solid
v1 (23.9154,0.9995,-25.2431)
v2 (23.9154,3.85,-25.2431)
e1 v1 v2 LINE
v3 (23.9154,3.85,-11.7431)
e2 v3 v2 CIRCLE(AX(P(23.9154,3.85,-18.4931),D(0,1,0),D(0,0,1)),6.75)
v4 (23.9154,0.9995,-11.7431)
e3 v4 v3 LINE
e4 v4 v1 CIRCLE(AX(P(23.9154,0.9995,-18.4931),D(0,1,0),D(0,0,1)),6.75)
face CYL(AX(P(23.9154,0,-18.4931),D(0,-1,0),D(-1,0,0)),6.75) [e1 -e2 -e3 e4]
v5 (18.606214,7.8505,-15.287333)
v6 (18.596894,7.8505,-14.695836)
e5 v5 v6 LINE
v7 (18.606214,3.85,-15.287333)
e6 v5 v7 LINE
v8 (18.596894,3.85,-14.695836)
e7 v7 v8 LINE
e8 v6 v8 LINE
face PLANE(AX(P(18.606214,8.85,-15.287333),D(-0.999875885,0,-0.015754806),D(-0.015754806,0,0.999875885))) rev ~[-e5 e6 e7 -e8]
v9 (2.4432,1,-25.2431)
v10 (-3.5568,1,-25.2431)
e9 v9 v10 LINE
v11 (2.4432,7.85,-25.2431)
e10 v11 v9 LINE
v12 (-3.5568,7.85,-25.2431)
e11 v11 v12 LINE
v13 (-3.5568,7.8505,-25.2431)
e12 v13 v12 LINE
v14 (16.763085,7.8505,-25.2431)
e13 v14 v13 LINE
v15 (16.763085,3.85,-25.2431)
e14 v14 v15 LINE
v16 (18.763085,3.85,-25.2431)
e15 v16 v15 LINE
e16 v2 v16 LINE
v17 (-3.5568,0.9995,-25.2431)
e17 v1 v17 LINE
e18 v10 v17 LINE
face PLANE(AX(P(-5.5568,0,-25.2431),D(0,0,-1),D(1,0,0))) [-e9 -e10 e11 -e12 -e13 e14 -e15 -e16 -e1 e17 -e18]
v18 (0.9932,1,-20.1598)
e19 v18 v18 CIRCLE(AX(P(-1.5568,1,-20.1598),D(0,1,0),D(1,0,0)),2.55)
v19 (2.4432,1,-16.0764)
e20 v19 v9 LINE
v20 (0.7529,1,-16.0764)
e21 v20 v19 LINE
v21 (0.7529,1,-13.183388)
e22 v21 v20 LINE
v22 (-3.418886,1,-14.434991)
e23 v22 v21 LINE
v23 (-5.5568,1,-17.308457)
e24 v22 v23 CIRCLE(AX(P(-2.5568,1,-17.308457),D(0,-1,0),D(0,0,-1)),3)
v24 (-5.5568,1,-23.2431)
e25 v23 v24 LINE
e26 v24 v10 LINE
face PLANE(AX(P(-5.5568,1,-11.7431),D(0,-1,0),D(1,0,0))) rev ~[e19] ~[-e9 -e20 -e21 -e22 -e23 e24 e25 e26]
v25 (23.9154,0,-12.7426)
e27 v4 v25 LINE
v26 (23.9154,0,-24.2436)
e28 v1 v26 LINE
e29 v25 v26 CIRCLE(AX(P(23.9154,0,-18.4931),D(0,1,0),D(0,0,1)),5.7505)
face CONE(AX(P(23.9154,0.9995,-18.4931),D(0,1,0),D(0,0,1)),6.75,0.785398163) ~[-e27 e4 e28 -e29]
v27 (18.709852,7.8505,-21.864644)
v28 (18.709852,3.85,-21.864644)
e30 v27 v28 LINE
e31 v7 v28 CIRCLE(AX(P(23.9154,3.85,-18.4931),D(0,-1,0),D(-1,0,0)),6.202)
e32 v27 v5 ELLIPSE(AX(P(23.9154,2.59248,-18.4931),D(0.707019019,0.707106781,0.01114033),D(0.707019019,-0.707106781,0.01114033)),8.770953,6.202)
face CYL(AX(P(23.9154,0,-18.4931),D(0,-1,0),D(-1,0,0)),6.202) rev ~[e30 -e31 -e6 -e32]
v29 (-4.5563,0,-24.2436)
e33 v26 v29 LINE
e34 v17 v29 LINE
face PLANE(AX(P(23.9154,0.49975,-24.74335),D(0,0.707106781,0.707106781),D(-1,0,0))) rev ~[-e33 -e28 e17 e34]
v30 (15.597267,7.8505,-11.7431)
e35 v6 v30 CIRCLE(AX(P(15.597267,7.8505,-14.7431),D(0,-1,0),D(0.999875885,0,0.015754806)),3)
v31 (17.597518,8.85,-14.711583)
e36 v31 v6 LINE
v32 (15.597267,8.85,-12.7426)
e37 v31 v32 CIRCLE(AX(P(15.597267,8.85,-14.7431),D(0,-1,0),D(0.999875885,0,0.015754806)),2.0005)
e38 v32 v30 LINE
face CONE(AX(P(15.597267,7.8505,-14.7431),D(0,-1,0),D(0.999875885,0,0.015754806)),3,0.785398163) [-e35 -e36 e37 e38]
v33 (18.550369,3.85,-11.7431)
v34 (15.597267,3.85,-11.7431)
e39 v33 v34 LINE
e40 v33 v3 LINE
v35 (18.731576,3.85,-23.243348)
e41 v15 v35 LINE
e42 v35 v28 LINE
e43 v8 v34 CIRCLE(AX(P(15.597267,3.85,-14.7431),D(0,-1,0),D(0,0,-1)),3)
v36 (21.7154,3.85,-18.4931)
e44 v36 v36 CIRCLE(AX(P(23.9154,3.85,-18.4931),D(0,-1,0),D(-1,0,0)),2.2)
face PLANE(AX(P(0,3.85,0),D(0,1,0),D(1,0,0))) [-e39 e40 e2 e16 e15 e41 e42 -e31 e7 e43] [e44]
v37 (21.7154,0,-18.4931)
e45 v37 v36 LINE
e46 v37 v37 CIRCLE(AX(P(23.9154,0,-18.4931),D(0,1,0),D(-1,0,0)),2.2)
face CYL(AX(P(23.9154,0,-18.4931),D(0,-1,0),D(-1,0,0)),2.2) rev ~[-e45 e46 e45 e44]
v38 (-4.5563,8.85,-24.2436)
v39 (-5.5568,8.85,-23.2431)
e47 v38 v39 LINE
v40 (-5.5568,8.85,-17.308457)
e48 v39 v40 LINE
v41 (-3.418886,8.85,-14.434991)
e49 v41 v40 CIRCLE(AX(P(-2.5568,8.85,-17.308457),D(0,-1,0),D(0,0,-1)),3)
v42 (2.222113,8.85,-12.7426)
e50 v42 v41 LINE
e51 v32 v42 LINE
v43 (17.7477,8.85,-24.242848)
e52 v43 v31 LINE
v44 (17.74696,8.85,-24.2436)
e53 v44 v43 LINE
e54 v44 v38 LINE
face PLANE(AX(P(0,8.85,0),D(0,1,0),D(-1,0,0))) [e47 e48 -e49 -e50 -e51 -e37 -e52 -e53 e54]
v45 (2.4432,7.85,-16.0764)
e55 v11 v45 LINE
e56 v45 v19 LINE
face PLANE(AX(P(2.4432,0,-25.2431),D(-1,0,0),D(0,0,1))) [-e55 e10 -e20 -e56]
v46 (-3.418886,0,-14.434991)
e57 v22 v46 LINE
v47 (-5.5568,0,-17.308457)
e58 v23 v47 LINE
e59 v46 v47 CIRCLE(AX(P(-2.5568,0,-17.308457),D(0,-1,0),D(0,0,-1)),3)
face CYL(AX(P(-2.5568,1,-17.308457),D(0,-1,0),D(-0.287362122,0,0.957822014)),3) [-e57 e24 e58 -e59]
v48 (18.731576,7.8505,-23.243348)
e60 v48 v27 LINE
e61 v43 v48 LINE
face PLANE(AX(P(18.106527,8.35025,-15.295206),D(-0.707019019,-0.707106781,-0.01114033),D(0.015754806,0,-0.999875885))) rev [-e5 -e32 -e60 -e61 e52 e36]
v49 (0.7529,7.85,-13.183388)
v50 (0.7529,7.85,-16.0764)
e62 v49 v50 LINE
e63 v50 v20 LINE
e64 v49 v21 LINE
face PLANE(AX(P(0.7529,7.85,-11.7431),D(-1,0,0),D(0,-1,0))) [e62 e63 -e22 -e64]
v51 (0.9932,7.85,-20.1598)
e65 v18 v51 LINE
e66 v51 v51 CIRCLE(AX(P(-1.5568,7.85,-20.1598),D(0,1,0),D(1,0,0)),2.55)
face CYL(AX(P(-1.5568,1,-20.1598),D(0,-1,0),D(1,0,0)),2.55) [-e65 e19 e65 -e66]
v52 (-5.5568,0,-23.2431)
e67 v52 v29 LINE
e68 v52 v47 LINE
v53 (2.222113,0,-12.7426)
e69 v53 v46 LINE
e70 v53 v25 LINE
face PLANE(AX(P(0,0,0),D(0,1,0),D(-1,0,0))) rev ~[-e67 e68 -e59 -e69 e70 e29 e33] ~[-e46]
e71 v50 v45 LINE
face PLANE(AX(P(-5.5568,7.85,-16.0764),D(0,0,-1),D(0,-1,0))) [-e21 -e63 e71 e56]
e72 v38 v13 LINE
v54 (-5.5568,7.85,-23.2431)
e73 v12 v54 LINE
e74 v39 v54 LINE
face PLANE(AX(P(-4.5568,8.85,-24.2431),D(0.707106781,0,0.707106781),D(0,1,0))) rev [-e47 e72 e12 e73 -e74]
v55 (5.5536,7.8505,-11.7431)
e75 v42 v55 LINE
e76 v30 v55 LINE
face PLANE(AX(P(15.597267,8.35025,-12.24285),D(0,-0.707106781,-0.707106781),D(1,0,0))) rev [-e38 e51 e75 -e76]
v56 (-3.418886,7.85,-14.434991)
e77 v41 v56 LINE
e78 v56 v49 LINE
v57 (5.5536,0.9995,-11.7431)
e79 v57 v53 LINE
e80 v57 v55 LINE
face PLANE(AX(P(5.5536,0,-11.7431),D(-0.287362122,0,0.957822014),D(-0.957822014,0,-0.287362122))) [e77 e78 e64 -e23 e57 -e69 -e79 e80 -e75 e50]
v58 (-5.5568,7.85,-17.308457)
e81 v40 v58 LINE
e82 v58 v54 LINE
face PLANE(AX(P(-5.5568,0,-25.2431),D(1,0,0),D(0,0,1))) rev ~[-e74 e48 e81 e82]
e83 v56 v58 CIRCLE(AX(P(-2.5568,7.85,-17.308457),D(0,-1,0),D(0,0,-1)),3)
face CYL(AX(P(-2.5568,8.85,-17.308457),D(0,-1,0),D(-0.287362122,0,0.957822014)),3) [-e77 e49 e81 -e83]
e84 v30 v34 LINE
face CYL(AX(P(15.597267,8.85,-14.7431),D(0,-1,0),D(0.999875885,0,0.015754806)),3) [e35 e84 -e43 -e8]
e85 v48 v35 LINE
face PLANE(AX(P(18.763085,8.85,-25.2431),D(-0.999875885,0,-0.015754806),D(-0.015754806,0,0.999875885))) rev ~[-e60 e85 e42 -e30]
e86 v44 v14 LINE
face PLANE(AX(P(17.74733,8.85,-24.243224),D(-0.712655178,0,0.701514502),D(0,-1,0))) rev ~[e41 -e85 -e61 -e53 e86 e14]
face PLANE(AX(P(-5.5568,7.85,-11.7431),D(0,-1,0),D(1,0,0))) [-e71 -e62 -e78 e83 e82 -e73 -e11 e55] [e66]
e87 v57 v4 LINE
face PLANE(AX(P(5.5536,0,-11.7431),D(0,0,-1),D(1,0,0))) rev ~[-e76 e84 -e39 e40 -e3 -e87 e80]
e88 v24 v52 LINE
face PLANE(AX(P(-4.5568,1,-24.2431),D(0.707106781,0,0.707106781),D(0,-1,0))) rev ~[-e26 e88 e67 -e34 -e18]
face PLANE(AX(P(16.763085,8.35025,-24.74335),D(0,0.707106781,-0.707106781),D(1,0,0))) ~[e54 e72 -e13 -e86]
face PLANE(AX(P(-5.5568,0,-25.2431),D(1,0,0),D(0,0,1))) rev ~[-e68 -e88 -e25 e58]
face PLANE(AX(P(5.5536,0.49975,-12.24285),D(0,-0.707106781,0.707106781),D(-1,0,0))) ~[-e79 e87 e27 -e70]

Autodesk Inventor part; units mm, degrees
ref_plane "YZ Plane" through (0, 0, 0) normal (1, 0, 0) x (0, 1, 0)
ref_plane "XZ Plane" through (0, 0, 0) normal (0, 1, 0) x (-1, 0, 0)
ref_plane "XY Plane" through (0, 0, 0) normal (0, 0, 1) x (1, 0, 0)
sketch "Sketch2" plane through (0, 0, 0) normal (0, 1, 0) x (-1, 0, 0)
  line L0 (-5.5536, -11.7431) -> (5.5568, -15.0764)
  line L1 (5.5568, -25.2431) -> (-23.9154, -25.2431)
  line L2 (-23.9154, -25.2431) -> (-23.9154, -11.7431)
  line L3 (-5.5536, -11.7431) -> (-23.9154, -11.7431)
  line L4 (5.5568, -25.2431) -> (5.5568, -15.0764)
  circle A0 centre (-23.9154, -18.4931) radius 6.75
  circle A1 centre (-23.9154, -18.4931) radius 2.2
  circle A2 centre (-23.9154, -18.4931) radius 6.202
  circle A3 centre (-24.9154, -18.9931) radius 6.25
  line L5 (-18.8553, -31.0955) -> (-18.419, -3.4058)
  point P0 (0, 0)
  point P1 (0, 0)
  point P2 (-19.4912, -10.8803)
  point P3 (-19.4912, -24.3803)
  point P4 (-23.9154, -12.2912)
  point P5 (-23.9154, -24.6951)
  dimension "d1" = 13.5
  dimension "d0" = 4.4
  dimension "d6" = 0.5
  dimension "d7" = 1
  dimension "d8" = 12.5
extrude "Extrusion1" add sketch "Sketch2" along normal blind 3.85 contours L0 L4 L1 L5 A0 L3 | L5 A0 L3 | A0 L5 A2 L2 | L2 A2 A3 A0 | A0 L5 A2 | L1 A0 L5 | A2 L5 A3 L2 | L2 A3 A2 | A3 A2 L2 A0 | L5 A2 A3 | A2 L5 | A0 A3 L2 | L2 A3 A2 L5 A0 | A3 A2 L2 A1 | L2 A1 A2 A3 | L2 A2 A3
extrude "Extrusion2" add sketch "Sketch2" along normal blind 8.85 contours L0 L4 L1 L5 A0 L3 | L5 A0 L3 | A0 L5 A2 L2 | A0 L5 A2 | L1 A0 L5 | L2 A3 A2 L5 A0 | L2 A2 A3 picked at (-23.6214, -24.9369)
sketch "Sketch3" plane through (0, 8.85, 0) normal (0, 1, 0) x (1, 0, 0)
  line L0 (-5.5568, 25.2431) -> (-5.5568, 15.0764) projected
  line L1 (-5.5568, 15.0764) -> (5.5536, 11.7431) projected
  line L2 (5.5536, 11.7431) -> (23.9154, 11.7431) projected
  line L3 (23.9154, 11.7431) -> (23.9154, 12.2912) projected
  arc A0 (23.9154, 24.6951) -> (23.9154, 12.2912) centre (23.9154, 18.4931) ccw projected
  line L4 (23.9154, 24.6951) -> (23.9154, 25.2431) projected
  line L5 (23.9154, 25.2431) -> (-5.5568, 25.2431) projected
  line L6 (18.8553, 31.0955) -> (18.419, 3.4058) projected
  point P0 (0, 0)
  point P1 (18.6062, 15.2873)
  point P2 (18.5504, 11.7431)
  point P3 (18.7631, 25.2431)
  point P4 (18.7099, 21.8646)
extrude "Extrusion3" cut sketch "Sketch3" against normal up to surface (5 mm away) contours L5 L4 A0 L6 | L6 A0 L3 L2
sketch "Sketch4" plane through (-5.5568, 0, -25.2431) normal (-1, 0, 0) x (0, 0, 1)
  line L0 (0, 0) -> (10.1667, 0) projected
  line L1 (10.1667, 0) -> (10.1667, 8.85) projected
  line L2 (0, 8.85) -> (10.1667, 8.85) projected
  line L3 (0, 0) -> (0, 8.85) projected
  line L4 (9.1667, 7.85) -> (9.1667, 1)
  line L5 (9.1667, 1) -> (1, 1)
  line L6 (1, 1) -> (1, 7.85)
  line L7 (1, 7.85) -> (9.1667, 7.85)
  point P0 (25.2431, 0)
  dimension "d11" = 1
extrude "Extrusion4" cut sketch "Sketch4" against normal blind 8 contours L4 L5 L6 L7
sketch "Sketch5" plane through (-5.5568, 1, -16.0764) normal (0, 1, 0) x (1, 0, 0)
  line L0 (0, 0) -> (0, 8.1667) projected
  line L1 (0, 0) -> (8, 0) projected
  line L2 (8, 0) -> (8, 8.1667) projected
  line L3 (0, 8.1667) -> (8, 8.1667) projected
  line L4 (8, 4.0834) -> (2.9855, 4.0834) construction
  line L5 (4, 0) -> (4, 4.0834) construction
  circle A0 centre (4, 4.0834) radius 2.55
  point P0 (5.5568, -16.0764)
  dimension "d14" = 5.1
extrude "Extrusion5" add sketch "Sketch5" along normal up to surface (6.85 mm away) contours A0
sketch "Sketch6" plane through (5.5536, 0, -11.7431) normal (0, 0, 1) x (1, 0, 0)
  line L0 (-11.1104, 7.85) -> (-11.1104, 1) projected
  line L1 (-11.1104, 7.85) -> (-4.8007, 7.85)
  line L2 (-4.8007, 7.85) -> (-4.8007, 1)
  line L3 (-11.1104, 1) -> (-4.8007, 1)
  point P0 (-5.5536, 0)
extrude "Extrusion6" cut sketch "Sketch6" against normal up to surface (4.3333 mm away)
sketch "Sketch7" plane through (-5.5568, 1, -24.2431) normal (0, 0, 1) x (1, 0, 0)
  line L0 (0, 0) -> (0, 6.85) projected
  line L1 (0, 0) -> (8, 0) projected
  line L2 (8, 0) -> (8, 6.85) projected
  line L3 (0, 6.85) -> (8, 6.85) projected
  point P0 (5.5568, -1)
extrude "Extrusion7" cut sketch "Sketch7" against normal blind 10.25
sketch "Sketch8" plane through (0, 8.85, 0) normal (0, 1, 0) x (1, 0, 0)
  circle A0 centre (-1.5568, 20.1598) radius 2.55 projected
  circle A1 centre (-1.5568, 20.1598) radius 2.55 projected
  line L0 (-5.5568, 25.2431) -> (2.4432, 25.2431) projected
  point P0 (0, 0)
fillet "Fillet1" radius 3 2 edges at (-5.5568, 8.35, -15.0764) (-5.5568, 0.5, -15.0764)
chamfer "Chamfer1" distance 2 angle 45 2 edges at (-5.5568, 8.35, -25.2431) (-5.5568, 0.5, -25.2431)
chamfer "Chamfer2" distance 2 angle 45 1 edges at (18.7631, 6.35, -25.2431)
fillet "Fillet2" radius 3 1 edges at (18.5504, 6.35, -11.7431)
chamfer "Chamfer3" distance 1 angle 45 7 edges at (6.6031, 8.85, -25.2431) (10.5754, 8.85, -11.7431) (17.7018, 8.85, -12.6052) (18.6016, 8.85, -14.9916) (14.7345, 0, -11.7431) (30.6654, 0, -18.4931) (10.1793, 0, -25.2431)
properties part number "Upper Leg"
